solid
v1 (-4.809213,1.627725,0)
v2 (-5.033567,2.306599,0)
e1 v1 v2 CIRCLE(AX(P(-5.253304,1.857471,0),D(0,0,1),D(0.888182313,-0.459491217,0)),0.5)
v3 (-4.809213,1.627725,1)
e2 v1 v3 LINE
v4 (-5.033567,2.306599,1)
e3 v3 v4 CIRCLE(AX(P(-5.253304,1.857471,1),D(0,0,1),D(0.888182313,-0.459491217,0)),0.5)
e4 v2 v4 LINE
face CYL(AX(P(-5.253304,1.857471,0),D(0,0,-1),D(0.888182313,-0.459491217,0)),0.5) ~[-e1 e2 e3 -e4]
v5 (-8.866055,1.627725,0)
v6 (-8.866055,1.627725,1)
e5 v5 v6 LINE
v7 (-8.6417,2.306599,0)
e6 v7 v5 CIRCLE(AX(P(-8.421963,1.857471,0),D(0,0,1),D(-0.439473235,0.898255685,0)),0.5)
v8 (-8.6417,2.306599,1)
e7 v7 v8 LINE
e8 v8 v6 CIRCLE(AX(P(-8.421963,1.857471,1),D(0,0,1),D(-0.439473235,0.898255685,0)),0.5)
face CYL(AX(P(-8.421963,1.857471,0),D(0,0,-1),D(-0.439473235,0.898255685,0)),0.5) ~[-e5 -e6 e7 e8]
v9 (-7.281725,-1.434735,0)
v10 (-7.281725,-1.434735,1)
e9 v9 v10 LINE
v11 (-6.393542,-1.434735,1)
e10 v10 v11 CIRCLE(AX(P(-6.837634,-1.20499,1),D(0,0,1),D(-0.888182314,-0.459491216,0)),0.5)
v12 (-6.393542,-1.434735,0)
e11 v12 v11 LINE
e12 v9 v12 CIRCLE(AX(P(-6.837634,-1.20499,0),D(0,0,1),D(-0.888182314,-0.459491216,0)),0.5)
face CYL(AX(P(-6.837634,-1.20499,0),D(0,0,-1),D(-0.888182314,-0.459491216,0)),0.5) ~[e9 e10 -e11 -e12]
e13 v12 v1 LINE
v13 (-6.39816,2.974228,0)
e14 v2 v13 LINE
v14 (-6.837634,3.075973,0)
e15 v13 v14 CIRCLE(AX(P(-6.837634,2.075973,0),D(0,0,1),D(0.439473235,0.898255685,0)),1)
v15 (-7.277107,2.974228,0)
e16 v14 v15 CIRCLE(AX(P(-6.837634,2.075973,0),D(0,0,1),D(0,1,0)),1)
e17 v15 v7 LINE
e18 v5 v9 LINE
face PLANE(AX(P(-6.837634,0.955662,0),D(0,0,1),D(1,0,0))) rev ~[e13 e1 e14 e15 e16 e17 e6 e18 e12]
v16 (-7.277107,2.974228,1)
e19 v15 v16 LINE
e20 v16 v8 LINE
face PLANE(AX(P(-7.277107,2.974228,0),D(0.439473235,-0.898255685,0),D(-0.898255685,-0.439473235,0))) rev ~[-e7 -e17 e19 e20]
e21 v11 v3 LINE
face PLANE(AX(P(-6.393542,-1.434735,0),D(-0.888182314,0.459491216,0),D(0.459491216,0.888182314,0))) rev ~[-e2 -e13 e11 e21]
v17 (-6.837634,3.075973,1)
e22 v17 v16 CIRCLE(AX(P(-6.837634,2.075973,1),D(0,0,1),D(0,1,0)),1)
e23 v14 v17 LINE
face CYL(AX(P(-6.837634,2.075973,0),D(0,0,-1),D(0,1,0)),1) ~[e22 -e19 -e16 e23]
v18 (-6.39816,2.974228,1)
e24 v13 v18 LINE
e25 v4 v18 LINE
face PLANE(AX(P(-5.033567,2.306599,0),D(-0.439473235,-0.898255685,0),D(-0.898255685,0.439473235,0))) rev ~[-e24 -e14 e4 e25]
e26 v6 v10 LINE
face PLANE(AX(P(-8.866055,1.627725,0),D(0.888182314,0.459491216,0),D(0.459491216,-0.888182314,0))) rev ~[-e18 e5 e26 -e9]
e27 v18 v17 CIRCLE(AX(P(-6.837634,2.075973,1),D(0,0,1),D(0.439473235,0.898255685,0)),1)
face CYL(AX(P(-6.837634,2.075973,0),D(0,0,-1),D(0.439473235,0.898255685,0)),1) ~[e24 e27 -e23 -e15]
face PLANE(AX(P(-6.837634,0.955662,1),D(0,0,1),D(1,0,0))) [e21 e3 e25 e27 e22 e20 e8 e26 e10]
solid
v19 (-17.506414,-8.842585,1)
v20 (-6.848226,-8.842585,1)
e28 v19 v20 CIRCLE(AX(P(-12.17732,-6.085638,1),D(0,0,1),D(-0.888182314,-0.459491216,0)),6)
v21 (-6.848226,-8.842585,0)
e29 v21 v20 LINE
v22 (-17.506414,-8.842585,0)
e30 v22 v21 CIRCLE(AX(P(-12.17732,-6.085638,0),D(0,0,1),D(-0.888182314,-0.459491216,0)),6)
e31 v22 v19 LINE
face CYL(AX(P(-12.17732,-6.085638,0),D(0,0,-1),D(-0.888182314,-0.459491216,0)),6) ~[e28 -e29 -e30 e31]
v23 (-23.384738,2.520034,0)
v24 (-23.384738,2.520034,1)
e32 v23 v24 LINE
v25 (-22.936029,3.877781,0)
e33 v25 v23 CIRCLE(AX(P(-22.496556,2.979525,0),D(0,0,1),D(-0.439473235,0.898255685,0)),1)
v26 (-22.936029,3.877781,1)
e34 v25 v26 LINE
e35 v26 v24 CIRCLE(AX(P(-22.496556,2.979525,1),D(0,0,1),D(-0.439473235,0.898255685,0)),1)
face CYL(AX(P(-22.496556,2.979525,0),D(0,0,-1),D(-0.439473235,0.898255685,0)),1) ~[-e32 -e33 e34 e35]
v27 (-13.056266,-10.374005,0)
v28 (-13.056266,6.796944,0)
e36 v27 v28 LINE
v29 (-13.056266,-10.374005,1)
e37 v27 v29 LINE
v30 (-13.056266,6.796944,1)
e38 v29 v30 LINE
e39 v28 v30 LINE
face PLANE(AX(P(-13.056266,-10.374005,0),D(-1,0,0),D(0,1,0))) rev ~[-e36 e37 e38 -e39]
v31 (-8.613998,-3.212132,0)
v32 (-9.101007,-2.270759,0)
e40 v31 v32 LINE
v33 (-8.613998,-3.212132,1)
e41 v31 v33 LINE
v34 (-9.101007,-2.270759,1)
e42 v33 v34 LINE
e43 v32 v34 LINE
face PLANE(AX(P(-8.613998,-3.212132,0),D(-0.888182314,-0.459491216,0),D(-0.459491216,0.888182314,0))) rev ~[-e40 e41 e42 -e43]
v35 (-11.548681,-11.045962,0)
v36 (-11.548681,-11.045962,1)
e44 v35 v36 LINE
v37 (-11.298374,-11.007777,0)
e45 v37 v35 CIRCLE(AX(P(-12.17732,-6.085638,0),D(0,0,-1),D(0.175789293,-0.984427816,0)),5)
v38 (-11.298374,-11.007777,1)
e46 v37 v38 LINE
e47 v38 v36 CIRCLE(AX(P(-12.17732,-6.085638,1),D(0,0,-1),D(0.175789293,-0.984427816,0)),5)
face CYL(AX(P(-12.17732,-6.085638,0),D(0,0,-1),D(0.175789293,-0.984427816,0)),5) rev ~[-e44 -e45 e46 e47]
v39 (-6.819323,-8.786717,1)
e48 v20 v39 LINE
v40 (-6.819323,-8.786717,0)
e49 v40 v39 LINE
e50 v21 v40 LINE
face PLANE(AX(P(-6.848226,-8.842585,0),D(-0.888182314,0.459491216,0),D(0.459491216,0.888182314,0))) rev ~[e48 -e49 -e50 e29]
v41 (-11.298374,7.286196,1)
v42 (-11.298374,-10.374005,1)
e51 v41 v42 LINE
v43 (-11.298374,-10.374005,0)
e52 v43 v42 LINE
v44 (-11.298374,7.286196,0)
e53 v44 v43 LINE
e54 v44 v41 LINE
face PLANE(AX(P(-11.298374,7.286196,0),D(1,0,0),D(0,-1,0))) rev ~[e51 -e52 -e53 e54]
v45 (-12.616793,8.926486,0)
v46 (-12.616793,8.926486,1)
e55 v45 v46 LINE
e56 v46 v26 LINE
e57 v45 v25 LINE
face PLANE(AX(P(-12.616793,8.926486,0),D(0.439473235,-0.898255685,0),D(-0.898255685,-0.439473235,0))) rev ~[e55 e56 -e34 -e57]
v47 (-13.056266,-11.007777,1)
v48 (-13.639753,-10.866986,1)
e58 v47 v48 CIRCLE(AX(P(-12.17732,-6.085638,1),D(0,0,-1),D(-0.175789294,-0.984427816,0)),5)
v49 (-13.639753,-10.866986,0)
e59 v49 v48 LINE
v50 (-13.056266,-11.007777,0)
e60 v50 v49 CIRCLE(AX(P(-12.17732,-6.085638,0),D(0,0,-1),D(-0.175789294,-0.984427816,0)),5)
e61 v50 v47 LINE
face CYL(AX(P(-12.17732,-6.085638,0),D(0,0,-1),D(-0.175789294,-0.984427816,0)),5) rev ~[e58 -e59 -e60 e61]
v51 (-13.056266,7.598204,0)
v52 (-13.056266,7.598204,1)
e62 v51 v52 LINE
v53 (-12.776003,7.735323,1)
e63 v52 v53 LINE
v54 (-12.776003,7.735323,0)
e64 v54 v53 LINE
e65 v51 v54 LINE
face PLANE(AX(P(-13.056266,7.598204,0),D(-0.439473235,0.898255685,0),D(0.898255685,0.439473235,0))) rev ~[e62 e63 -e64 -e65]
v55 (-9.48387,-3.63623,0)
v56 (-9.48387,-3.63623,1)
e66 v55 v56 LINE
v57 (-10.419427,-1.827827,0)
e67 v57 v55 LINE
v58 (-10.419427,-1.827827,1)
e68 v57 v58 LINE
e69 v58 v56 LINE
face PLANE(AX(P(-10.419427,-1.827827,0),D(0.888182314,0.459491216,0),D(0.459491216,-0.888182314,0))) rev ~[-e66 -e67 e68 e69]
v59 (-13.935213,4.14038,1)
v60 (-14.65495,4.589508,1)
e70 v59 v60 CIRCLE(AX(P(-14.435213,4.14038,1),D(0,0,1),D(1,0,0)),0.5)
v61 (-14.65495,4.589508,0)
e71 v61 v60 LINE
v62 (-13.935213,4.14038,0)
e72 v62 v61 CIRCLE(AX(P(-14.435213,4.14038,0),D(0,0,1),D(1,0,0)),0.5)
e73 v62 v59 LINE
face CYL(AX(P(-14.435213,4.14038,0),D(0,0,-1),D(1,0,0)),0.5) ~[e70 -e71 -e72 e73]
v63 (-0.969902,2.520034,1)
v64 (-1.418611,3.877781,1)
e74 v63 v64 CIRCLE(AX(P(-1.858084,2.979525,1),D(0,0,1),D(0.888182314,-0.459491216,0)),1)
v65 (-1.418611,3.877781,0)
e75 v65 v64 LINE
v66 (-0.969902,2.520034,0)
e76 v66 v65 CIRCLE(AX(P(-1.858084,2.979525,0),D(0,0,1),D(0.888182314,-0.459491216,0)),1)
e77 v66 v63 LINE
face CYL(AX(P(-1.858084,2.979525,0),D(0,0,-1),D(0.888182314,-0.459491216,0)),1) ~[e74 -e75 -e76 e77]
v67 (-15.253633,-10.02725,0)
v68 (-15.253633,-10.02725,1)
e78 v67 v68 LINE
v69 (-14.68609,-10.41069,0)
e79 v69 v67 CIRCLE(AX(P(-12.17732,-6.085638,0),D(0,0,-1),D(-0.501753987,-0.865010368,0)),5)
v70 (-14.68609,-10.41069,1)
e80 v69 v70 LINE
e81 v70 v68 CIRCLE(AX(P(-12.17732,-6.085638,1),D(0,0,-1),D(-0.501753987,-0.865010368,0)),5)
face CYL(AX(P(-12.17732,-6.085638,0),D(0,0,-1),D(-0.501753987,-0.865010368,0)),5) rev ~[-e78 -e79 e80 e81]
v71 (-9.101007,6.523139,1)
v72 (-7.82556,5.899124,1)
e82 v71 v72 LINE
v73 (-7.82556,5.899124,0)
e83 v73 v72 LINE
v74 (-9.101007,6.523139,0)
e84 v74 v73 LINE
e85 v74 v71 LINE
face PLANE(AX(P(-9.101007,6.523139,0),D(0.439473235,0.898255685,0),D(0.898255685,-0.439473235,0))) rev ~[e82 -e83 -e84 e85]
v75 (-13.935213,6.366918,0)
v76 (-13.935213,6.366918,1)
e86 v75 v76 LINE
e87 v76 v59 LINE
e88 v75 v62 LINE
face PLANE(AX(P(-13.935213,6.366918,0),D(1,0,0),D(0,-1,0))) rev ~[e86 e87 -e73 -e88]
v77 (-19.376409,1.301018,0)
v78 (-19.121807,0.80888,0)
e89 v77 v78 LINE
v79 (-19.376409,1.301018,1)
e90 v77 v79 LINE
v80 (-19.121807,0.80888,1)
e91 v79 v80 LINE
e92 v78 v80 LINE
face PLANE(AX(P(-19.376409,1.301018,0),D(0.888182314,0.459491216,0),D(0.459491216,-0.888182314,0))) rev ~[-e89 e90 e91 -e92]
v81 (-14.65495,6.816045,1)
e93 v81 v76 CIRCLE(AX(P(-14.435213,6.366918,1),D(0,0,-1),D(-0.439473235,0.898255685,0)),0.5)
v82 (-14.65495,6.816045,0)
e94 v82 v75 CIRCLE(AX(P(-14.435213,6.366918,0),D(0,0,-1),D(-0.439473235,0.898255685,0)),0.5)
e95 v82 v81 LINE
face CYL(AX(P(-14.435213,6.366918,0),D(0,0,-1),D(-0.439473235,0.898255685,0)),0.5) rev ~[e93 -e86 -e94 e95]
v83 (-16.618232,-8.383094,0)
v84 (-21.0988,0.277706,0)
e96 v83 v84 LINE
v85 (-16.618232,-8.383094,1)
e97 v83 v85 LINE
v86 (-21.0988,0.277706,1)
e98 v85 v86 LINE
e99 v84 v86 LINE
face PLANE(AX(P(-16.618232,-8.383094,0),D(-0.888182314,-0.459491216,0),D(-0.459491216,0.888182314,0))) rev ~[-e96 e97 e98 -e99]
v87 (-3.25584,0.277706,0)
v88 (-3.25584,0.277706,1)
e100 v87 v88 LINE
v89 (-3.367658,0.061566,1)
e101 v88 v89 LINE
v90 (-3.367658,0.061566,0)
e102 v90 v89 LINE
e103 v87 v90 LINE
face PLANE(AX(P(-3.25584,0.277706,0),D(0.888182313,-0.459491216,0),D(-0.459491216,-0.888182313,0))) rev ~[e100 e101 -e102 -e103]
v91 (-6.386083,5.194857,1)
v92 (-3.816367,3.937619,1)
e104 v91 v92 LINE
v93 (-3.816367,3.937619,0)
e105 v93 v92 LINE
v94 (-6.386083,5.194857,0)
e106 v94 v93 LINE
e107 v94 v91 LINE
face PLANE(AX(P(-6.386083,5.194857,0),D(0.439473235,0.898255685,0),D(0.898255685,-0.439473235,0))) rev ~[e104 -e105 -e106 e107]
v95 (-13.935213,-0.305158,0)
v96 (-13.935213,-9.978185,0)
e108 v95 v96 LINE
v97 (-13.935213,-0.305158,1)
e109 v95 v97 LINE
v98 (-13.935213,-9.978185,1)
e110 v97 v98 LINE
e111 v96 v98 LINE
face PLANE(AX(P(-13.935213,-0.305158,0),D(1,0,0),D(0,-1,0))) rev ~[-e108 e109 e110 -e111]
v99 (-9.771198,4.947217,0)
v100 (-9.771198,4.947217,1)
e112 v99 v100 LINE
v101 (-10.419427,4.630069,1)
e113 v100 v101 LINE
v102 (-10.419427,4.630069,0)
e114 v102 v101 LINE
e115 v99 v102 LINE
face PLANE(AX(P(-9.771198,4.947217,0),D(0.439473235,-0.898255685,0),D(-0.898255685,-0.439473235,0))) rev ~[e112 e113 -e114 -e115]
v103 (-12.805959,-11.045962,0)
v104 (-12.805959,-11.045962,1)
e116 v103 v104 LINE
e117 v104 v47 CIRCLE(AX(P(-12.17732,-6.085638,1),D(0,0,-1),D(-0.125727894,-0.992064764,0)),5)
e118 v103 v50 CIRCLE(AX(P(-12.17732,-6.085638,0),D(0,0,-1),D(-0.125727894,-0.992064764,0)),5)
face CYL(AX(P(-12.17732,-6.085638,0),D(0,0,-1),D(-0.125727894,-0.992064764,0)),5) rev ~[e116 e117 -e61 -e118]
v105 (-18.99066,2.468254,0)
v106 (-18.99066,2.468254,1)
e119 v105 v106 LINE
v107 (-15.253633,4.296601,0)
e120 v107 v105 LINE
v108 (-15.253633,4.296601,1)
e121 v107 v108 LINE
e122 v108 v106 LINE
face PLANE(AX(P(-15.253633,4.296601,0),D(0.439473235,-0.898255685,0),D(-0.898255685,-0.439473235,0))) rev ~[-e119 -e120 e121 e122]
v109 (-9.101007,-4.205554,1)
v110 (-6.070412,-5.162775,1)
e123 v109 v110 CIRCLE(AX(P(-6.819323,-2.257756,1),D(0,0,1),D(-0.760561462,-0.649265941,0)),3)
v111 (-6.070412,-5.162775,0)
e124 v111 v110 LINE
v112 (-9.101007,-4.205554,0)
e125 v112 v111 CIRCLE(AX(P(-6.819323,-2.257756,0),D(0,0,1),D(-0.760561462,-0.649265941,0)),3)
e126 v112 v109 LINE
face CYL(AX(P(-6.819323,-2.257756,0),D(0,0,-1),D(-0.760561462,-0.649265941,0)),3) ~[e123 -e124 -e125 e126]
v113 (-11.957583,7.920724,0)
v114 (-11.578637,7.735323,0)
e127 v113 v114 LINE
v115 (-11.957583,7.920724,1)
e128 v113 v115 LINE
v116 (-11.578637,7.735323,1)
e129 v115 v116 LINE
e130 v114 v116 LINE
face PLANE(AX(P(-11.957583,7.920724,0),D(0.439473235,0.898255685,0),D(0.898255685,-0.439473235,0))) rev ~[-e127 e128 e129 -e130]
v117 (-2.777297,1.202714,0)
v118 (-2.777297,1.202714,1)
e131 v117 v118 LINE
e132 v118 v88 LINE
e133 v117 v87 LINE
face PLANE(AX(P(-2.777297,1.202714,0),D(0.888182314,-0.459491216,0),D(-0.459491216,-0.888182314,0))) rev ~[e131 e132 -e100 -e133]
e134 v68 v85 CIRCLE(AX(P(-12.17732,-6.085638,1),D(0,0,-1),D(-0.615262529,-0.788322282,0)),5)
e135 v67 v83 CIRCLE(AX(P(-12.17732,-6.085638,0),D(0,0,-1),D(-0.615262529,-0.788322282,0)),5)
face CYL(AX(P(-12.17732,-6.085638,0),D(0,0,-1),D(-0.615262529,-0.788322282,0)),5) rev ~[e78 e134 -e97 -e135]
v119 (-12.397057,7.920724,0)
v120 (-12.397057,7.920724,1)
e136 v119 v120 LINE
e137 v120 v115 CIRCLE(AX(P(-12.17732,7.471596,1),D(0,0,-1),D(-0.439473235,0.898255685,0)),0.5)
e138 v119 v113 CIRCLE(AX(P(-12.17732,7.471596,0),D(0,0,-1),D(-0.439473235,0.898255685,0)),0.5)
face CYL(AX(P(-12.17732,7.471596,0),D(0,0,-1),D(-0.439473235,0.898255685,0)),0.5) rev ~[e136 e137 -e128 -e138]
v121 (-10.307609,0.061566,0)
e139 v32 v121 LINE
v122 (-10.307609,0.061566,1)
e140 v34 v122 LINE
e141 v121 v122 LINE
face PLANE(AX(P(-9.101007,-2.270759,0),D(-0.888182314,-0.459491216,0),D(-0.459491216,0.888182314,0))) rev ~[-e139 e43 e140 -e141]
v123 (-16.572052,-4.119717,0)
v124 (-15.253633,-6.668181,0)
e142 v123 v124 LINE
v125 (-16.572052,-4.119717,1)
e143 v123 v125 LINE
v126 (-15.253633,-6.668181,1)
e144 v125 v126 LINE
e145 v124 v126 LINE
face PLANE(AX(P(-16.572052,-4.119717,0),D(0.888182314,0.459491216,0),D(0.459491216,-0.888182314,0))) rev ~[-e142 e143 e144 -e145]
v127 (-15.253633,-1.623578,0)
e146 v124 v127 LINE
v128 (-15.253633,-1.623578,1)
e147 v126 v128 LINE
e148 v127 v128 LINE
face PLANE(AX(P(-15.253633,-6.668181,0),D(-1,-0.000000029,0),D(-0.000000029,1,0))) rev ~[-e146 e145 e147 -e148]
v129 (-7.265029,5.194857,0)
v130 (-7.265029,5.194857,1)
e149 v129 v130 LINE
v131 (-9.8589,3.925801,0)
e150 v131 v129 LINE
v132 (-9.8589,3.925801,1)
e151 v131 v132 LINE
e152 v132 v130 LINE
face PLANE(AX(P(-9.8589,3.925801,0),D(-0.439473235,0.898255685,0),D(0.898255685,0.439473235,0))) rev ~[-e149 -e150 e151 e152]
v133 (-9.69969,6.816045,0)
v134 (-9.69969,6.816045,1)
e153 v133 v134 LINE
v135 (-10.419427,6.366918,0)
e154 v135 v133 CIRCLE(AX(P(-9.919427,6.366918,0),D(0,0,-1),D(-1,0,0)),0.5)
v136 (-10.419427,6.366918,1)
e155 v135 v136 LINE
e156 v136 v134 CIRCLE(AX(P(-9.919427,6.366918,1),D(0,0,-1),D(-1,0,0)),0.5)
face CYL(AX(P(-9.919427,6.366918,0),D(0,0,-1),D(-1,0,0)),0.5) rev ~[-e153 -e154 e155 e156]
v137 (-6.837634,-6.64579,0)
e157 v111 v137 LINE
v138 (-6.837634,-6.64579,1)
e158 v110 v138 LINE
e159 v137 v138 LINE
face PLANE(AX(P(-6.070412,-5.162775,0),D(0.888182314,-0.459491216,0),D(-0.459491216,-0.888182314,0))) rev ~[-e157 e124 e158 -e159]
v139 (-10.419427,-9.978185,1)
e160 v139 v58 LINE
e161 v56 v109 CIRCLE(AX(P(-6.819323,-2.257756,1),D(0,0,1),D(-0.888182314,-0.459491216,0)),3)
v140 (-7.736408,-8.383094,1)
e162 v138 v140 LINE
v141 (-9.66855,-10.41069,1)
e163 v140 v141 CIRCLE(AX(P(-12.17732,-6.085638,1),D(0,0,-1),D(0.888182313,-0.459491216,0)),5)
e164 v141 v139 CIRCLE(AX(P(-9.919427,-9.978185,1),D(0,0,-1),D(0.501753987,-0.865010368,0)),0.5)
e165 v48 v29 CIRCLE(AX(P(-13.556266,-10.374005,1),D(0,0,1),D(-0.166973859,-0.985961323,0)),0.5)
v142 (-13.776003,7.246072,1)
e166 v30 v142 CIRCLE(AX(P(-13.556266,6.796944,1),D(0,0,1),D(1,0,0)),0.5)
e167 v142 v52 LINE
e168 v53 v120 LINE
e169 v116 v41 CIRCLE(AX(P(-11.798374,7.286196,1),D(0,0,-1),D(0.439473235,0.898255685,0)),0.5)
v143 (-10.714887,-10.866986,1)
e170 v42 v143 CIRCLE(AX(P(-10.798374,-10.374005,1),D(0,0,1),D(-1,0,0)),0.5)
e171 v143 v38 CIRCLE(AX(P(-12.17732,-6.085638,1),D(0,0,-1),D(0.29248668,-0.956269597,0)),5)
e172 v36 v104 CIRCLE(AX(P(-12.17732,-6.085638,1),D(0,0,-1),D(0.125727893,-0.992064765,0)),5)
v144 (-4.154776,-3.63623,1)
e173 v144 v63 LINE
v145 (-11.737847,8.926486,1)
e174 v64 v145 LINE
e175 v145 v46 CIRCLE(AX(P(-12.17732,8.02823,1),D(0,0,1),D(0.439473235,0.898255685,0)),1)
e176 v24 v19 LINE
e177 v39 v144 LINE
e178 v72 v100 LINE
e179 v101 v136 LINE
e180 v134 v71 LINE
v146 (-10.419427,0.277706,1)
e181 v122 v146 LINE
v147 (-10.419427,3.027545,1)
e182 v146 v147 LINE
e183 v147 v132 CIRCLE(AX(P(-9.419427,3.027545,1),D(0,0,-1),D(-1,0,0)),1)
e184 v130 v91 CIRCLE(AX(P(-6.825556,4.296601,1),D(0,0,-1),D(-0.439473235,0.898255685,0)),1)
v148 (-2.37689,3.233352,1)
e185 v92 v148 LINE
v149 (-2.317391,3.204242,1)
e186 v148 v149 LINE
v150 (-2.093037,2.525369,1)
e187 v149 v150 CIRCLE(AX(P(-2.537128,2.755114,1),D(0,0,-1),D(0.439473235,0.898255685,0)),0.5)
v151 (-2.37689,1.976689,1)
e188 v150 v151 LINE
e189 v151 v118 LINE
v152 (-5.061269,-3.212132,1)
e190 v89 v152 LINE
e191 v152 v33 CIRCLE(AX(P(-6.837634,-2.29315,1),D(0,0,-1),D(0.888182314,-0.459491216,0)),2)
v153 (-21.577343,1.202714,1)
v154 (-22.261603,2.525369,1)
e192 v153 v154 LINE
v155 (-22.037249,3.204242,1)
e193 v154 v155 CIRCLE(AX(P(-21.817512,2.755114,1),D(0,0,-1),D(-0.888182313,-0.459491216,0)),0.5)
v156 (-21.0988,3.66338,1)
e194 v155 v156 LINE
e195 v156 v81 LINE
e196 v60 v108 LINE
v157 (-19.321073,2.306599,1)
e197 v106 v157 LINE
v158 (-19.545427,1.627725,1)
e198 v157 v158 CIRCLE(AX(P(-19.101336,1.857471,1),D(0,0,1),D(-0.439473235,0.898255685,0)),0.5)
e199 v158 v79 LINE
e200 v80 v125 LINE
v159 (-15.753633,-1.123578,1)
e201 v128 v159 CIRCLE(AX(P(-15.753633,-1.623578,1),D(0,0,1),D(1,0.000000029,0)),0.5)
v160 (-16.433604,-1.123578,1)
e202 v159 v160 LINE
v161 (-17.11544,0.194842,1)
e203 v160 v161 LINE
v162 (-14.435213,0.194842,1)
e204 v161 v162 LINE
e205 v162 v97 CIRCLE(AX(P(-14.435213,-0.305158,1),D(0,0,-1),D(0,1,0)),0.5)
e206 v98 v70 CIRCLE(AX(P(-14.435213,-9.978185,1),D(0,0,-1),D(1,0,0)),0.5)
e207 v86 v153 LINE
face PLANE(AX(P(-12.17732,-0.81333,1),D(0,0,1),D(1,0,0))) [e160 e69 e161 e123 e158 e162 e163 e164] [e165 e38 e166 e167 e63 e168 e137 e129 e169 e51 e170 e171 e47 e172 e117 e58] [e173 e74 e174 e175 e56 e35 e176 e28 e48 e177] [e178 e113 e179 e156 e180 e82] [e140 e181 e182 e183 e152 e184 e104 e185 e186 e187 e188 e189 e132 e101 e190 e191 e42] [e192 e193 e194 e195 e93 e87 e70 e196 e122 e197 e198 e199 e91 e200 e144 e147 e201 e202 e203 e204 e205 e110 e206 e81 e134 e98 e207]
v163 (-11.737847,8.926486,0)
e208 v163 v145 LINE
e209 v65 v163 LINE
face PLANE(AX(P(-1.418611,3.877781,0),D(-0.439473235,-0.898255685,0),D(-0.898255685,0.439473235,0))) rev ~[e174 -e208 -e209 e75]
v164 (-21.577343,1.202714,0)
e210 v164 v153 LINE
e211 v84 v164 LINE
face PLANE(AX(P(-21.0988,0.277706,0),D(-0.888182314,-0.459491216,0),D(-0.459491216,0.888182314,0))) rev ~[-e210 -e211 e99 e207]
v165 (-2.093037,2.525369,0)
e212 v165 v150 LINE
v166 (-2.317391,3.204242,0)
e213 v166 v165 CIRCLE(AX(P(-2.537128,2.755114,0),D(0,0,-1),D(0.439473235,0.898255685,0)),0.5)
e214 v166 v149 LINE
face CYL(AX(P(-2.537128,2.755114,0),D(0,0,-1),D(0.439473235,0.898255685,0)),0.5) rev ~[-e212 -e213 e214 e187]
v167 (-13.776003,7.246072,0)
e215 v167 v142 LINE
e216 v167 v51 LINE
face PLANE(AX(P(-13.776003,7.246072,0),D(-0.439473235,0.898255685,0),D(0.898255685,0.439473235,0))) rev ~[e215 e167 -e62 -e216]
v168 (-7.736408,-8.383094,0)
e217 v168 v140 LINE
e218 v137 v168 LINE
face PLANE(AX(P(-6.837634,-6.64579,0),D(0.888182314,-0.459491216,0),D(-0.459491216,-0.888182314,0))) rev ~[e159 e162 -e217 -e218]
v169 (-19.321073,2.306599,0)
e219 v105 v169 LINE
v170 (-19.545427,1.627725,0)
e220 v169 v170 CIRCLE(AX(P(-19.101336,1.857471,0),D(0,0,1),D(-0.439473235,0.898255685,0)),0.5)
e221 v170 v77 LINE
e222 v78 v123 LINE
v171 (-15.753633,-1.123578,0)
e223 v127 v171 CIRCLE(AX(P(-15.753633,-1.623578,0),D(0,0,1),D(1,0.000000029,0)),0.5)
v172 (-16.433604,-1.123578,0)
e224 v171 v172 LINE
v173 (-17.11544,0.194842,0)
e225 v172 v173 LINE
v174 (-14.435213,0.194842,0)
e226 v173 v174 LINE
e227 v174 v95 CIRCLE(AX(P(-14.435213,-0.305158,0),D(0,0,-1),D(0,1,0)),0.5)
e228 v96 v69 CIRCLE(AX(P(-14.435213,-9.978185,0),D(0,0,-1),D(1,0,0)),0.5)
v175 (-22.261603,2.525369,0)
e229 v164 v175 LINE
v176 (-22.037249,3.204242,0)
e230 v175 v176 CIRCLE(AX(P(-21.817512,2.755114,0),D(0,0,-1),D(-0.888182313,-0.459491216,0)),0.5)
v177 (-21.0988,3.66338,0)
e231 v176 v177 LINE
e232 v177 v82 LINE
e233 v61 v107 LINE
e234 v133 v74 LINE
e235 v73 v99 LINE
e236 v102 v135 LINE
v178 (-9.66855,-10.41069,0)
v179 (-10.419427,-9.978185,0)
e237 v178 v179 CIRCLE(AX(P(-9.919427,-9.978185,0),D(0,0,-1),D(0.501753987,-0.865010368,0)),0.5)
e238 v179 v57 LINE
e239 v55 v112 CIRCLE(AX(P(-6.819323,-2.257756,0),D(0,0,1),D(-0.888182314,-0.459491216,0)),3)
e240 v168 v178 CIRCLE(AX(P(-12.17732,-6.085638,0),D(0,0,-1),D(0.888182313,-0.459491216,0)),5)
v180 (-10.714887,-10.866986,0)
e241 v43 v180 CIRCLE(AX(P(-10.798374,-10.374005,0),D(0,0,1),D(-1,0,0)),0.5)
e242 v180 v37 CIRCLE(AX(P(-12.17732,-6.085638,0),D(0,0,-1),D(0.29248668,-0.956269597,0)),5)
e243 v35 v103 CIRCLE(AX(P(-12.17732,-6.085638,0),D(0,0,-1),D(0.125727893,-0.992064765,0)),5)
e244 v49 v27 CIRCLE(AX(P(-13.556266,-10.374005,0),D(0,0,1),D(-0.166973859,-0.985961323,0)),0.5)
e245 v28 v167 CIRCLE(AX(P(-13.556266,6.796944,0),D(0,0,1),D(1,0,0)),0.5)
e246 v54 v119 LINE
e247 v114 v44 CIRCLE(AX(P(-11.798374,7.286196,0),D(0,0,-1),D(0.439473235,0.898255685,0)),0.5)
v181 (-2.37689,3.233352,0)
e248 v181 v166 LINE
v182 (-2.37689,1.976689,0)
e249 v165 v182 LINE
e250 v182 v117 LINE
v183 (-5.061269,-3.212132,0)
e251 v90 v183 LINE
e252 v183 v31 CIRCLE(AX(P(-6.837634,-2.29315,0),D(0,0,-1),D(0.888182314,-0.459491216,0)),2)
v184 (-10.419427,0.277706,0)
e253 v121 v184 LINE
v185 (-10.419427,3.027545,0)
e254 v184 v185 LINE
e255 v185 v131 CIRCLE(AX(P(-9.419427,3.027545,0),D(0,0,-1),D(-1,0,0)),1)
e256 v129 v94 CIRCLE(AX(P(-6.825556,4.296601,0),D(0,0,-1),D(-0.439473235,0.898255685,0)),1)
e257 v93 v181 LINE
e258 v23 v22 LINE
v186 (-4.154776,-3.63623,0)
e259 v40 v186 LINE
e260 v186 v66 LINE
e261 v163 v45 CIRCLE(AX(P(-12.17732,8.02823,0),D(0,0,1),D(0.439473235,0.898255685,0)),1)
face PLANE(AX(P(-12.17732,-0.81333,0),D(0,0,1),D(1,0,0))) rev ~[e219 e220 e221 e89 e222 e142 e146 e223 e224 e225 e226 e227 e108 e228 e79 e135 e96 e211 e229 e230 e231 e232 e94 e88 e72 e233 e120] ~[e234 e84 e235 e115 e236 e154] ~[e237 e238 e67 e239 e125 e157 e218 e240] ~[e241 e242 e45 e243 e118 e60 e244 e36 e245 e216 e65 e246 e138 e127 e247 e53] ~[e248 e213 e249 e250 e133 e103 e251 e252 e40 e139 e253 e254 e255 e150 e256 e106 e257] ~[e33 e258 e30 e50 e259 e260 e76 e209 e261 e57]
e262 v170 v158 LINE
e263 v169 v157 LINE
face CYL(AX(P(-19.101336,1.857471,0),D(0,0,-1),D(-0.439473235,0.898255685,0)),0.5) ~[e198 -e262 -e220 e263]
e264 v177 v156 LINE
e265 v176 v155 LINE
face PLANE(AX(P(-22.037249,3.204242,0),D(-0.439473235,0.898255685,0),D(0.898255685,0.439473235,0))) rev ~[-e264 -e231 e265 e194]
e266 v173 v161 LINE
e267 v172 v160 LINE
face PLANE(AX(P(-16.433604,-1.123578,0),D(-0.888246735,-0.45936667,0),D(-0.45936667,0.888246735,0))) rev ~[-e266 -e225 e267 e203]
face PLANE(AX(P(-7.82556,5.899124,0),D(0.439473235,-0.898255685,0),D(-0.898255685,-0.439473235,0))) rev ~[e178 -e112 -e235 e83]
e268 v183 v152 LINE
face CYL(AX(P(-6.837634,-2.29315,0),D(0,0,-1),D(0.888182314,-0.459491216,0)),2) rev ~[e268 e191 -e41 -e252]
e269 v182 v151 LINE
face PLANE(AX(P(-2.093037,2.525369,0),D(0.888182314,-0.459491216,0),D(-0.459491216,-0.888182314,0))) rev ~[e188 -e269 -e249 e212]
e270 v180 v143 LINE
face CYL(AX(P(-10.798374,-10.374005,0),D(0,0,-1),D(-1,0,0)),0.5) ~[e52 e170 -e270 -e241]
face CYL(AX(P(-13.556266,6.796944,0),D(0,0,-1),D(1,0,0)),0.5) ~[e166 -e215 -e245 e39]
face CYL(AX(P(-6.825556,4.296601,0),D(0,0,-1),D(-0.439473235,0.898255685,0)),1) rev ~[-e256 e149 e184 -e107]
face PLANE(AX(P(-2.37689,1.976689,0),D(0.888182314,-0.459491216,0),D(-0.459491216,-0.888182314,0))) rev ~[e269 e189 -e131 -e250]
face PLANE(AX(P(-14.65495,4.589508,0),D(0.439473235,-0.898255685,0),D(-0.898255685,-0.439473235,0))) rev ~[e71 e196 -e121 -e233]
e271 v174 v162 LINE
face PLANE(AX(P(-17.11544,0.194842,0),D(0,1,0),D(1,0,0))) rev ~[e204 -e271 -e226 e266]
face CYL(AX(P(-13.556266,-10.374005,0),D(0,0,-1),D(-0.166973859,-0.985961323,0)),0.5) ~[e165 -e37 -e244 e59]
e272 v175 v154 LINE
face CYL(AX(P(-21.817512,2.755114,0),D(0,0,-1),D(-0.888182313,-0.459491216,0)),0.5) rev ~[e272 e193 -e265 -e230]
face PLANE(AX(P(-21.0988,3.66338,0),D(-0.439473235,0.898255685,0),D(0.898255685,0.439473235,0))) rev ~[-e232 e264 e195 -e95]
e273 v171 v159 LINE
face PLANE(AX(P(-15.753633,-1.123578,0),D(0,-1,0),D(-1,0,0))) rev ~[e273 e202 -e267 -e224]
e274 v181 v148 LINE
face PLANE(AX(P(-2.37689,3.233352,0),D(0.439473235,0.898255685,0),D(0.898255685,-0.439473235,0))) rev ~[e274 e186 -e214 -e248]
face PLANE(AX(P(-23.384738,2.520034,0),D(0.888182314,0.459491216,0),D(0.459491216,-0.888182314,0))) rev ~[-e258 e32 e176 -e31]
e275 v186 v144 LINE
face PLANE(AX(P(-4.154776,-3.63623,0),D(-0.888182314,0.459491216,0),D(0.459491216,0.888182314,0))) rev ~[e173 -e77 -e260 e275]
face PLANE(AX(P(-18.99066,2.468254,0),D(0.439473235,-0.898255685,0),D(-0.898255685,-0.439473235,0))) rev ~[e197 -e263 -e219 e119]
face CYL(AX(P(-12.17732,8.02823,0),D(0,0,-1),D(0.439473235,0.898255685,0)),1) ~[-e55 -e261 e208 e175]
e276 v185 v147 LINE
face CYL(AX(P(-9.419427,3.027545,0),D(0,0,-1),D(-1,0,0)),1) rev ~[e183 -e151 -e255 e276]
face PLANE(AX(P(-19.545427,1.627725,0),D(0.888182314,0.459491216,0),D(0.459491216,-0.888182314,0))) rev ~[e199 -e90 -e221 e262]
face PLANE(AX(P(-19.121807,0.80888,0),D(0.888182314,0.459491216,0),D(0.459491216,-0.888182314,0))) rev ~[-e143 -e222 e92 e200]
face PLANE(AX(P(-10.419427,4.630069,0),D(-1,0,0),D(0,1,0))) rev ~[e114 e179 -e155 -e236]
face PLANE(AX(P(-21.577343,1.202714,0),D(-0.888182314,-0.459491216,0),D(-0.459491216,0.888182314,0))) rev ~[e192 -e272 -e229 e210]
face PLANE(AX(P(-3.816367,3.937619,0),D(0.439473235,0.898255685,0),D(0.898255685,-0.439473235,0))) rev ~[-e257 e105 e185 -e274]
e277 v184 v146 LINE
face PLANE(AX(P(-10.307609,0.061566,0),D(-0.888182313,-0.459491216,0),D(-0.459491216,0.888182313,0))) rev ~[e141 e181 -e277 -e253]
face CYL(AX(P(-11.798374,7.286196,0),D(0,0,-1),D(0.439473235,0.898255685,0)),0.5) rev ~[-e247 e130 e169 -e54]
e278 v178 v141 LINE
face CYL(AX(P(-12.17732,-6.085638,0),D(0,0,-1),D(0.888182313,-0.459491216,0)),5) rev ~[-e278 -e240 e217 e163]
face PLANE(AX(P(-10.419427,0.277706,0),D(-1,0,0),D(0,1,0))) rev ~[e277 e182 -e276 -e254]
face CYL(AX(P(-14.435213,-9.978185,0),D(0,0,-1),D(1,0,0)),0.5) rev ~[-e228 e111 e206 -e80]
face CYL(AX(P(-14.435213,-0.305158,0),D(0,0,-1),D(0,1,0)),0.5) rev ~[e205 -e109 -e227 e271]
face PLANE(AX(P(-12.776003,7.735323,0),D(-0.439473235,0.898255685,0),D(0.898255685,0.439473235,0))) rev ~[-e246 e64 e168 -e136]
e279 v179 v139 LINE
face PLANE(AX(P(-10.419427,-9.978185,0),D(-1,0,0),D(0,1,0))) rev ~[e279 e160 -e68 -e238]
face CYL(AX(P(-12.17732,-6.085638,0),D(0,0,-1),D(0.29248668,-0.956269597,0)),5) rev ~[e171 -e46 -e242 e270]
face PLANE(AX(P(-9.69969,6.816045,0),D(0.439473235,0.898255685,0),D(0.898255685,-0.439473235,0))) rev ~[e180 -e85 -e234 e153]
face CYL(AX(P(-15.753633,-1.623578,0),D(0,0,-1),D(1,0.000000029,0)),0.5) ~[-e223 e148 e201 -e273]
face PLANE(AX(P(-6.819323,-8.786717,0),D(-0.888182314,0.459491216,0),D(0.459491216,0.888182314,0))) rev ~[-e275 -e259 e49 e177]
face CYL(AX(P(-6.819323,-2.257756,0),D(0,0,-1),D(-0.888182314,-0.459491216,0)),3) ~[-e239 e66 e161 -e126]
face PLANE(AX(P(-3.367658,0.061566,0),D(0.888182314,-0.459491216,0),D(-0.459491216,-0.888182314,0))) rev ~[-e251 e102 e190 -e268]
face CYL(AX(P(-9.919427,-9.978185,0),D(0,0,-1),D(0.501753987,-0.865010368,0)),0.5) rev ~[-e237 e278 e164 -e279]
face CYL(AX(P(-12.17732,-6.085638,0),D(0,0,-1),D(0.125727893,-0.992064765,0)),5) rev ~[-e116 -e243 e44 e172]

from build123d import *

# Parameters (mm, degrees)
F1_DEPTH = 1


# Not quite as in the source:
# - a feature names something its author has since deleted; it is built from what else it names


with BuildPart() as f1:
    # F0 (on Top) → F1 (new body)
    with BuildSketch(Plane.XY):
        with BuildLine():
            ThreePointArc((-11.7378467649, 8.9264858588), (-12.17732, 9.0282301738), (-12.6167932351, 8.9264858588))
            Line((-12.6167932351, 8.9264858588), (-22.9360292278, 3.8777807945))
            ThreePointArc((-22.9360292278, 3.8777807945), (-23.4460487393, 3.2933140895), (-23.3847383062, 2.5200338931))
            Line((-23.3847383062, 2.5200338931), (-17.5064138811, -8.8425854586))
            ThreePointArc((-17.5064138811, -8.8425854586), (-12.17732, -12.0856381601), (-6.8482261189, -8.8425854586))
            Line((-6.8482261189, -8.8425854586), (-6.8193229677, -8.786716561))
            Line((-6.8193229677, -8.786716561), (-4.1547760271, -3.6362297146))
            Line((-4.1547760271, -3.6362297146), (-0.9699016938, 2.5200338931))
            ThreePointArc((-0.9699016938, 2.5200338931), (-0.9085912607, 3.2933140895), (-1.4186107722, 3.8777807945))
            Line((-1.4186107722, 3.8777807945), (-11.7378467649, 8.9264858588))
        make_face()
        with BuildLine():
            ThreePointArc((-13.9352129405, -9.9781848161), (-14.1856518225, -10.4114506102), (-14.6860899339, -10.4106900001))
            ThreePointArc((-14.6860899339, -10.4106900001), (-14.9764347702, -10.2286994079), (-15.253632646, -10.0272495698))
            ThreePointArc((-15.253632646, -10.0272495698), (-16.0247836651, -9.2789159973), (-16.6182315676, -8.3830942422))
            Line((-16.6182315676, -8.3830942422), (-21.0987998739, 0.2777057515))
            Line((-21.0987998739, 0.2777057515), (-21.5773427489, 1.202714332))
            Line((-21.5773427489, 1.202714332), (-22.2616031934, 2.5253686134))
            ThreePointArc((-22.2616031934, 2.5253686134), (-22.29225841, 2.9120087116), (-22.0372486542, 3.2042420641))
            Line((-22.0372486542, 3.2042420641), (-21.0987998739, 3.6633798445))
            Line((-21.0987998739, 3.6633798445), (-14.6549495581, 6.8160453855))
            ThreePointArc((-14.6549495581, 6.8160453855), (-14.1705134022, 6.7911040048), (-13.9352129405, 6.366917543))
            Line((-13.9352129405, 6.366917543), (-13.9352129405, 4.1403800065))
            ThreePointArc((-13.9352129405, 4.1403800065), (-14.1705134022, 4.5645664683), (-14.6549495581, 4.589507849))
            Line((-14.6549495581, 4.589507849), (-15.253632646, 4.2966010544))
            Line((-15.253632646, 4.2966010544), (-18.9906600384, 2.4682535744))
            Line((-18.9906600384, 2.4682535744), (-18.5866887981, 1.687389658))
            Line((-18.5866887981, 1.687389658), (-16.9010777379, 2.5120779491))
            Line((-16.9010777379, 2.5120779491), (-14.6549495581, 3.6110002651))
            ThreePointArc((-14.6549495581, 3.6110002651), (-14.1705134022, 3.5860588844), (-13.9352129405, 3.1618724226))
            Line((-13.9352129405, 3.1618724226), (-13.9352129405, 1.0737917123))
            Line((-13.9352129405, 1.0737917123), (-13.9352129405, -0.3051582877))
            Line((-13.9352129405, -0.3051582877), (-13.9352129405, -9.9781848161))
        make_face(mode=Mode.SUBTRACT)
        with BuildLine():
            Line((-10.6659804544, -10.8341303593), (-10.4194270595, -10.7664300173))
            ThreePointArc((-10.4194270595, -10.7664300173), (-10.5663720437, -10.8190139832), (-10.7148866004, -10.8669861449))
            ThreePointArc((-10.7148866004, -10.8669861449), (-11.0045154737, -10.9461452883), (-11.2983735297, -11.0077772381))
            ThreePointArc((-11.2983735297, -11.0077772381), (-11.423285282, -11.0284543254), (-11.548680536, -11.0459619827))
            ThreePointArc((-11.548680536, -11.0459619827), (-11.6318465406, -11.0842260567), (-11.720595012, -11.1066856319))
            ThreePointArc((-11.720595012, -11.1066856319), (-12.17732, -11.1424265632), (-12.634044988, -11.1066856319))
            ThreePointArc((-12.634044988, -11.1066856319), (-12.7227934594, -11.0842260567), (-12.805959464, -11.0459619827))
            ThreePointArc((-12.805959464, -11.0459619827), (-12.931354718, -11.0284543254), (-13.0562664703, -11.0077772381))
            ThreePointArc((-13.0562664703, -11.0077772381), (-13.3501245263, -10.9461452883), (-13.6397533997, -10.8669861449))
            ThreePointArc((-13.6397533997, -10.8669861449), (-13.2335773511, -10.7559370641), (-13.0562664703, -10.3740054834))
            Line((-13.0562664703, -10.3740054834), (-13.0562664703, -10.0437429667))
            Line((-13.0562664703, -10.0437429667), (-13.0562664703, 5.3716664708))
            Line((-13.0562664703, 5.3716664708), (-13.0562664703, 6.7969437096))
            ThreePointArc((-13.0562664703, 6.7969437096), (-13.2915669319, 7.2211301714), (-13.7760030878, 7.246071552))
            Line((-13.7760030878, 7.246071552), (-13.0562664703, 7.5982040073))
            Line((-13.0562664703, 7.5982040073), (-12.7760030878, 7.7353233792))
            Line((-12.7760030878, 7.7353233792), (-12.3970566176, 7.9207236322))
            ThreePointArc((-12.3970566176, 7.9207236322), (-12.17732, 7.9715957897), (-11.9575833824, 7.9207236322))
            Line((-11.9575833824, 7.9207236322), (-11.5786369122, 7.7353233792))
            ThreePointArc((-11.5786369122, 7.7353233792), (-11.3741870679, 7.5508950751), (-11.2983735297, 7.2861955367))
            Line((-11.2983735297, 7.2861955367), (-11.2983735297, -10.0437429667))
            Line((-11.2983735297, -10.0437429667), (-11.2983735297, -10.3519767804))
            ThreePointArc((-11.2983735297, -10.3519767804), (-11.1015265128, -10.7495925105), (-10.6659804544, -10.8341303593))
        make_face(mode=Mode.SUBTRACT)
        with BuildLine():
            Line((-5.5053601225, -4.0705468447), (-6.0704119356, -5.1627745276))
            Line((-6.0704119356, -5.1627745276), (-6.8376335928, -6.6457902679))
            Line((-6.8376335928, -6.6457902679), (-7.7364084324, -8.3830942422))
            ThreePointArc((-7.7364084324, -8.3830942422), (-8.5576094615, -9.5349418025), (-9.6685500661, -10.4106900001))
            ThreePointArc((-9.6685500661, -10.4106900001), (-10.1689881775, -10.4114506102), (-10.4194270595, -9.9781848161))
            Line((-10.4194270595, -9.9781848161), (-10.4194270595, -1.8278266693))
            Line((-10.4194270595, -1.8278266693), (-10.4194270595, -0.3051582877))
            Line((-10.4194270595, -0.3051582877), (-10.4194270595, 0.2777057515))
            Line((-10.4194270595, 0.2777057515), (-10.4194270595, 0.5210568374))
            Line((-10.4194270595, 0.5210568374), (-10.4194270595, 3.0275448634))
            Line((-10.4194270595, 3.0275448634), (-10.4194270595, 4.6300693884))
            Line((-10.4194270595, 4.6300693884), (-10.4194270595, 6.366917543))
            Line((-10.4194270595, 6.366917543), (-10.4194270595, 7.1681778407))
            Line((-10.4194270595, 7.1681778407), (-9.6996904419, 6.8160453855))
            Line((-9.6996904419, 6.8160453855), (-9.101007354, 6.5231385909))
            Line((-9.101007354, 6.5231385909), (-7.825559943, 5.8991236145))
            Line((-7.825559943, 5.8991236145), (-6.386082692, 5.1948567393))
            Line((-6.386082692, 5.1948567393), (-3.816366891, 3.9376185884))
            Line((-3.816366891, 3.9376185884), (-2.3768901261, 3.2333519511))
            Line((-2.3768901261, 3.2333519511), (-2.3173913458, 3.2042420641))
            ThreePointArc((-2.3173913458, 3.2042420641), (-2.06238159, 2.9120087116), (-2.0930368066, 2.5253686134))
            Line((-2.0930368066, 2.5253686134), (-2.3768901261, 1.9766889238))
            Line((-2.3768901261, 1.9766889238), (-2.7772972511, 1.202714332))
            Line((-2.7772972511, 1.202714332), (-3.2558401261, 0.2777057515))
            Line((-3.2558401261, 0.2777057515), (-3.3676578126, 0.061565621))
            Line((-3.3676578126, 0.061565621), (-5.0612689658, -3.2121323703))
            Line((-5.0612689658, -3.2121323703), (-5.5053601225, -4.0705468447))
        make_face(mode=Mode.SUBTRACT)
        with BuildLine():
            Line((-16.5720523514, -4.1197169088), (-15.2536327446, -6.6681812422))
            Line((-15.2536327446, -6.6681812422), (-15.2536328928, -1.623578273))
            ThreePointArc((-15.2536328928, -1.623578273), (-15.4000795074, -1.2700248919), (-15.7536328928, -1.1235782877))
            Line((-15.7536328928, -1.1235782877), (-16.0720525039, -1.1235782877))
            Line((-16.0720525039, -1.1235782877), (-16.4336040792, -1.1235782877))
            Line((-16.4336040792, -1.1235782877), (-17.1154396337, 0.1948417123))
            Line((-17.1154396337, 0.1948417123), (-16.0720524345, 0.1948417123))
            Line((-16.0720524345, 0.1948417123), (-15.2536329075, 0.1948417123))
            Line((-15.2536329075, 0.1948417123), (-14.4352129405, 0.1948417123))
            ThreePointArc((-14.4352129405, 0.1948417123), (-14.08165955, 0.0483951029), (-13.9352129405, -0.3051582877))
            Line((-13.9352129405, -0.3051582877), (-13.9352129405, 1.0737917123))
            Line((-13.9352129405, 1.0737917123), (-15.2536329075, 1.0737917123))
            Line((-15.2536329075, 1.0737917123), (-18.2692507427, 1.0737917123))
            Line((-18.2692507427, 1.0737917123), (-18.6097401643, 1.0737917123))
            Line((-18.6097401643, 1.0737917123), (-19.1218068604, 0.8088797168))
            Line((-19.1218068604, 0.8088797168), (-16.5720523514, -4.1197169088))
        make_face()
        Polygon((-16.1325828631, -3.0563212317), (-16.6777508926, -2.0025282877), (-16.1325828631, -2.0025282877), (-16.1325828631, -2.6348403451), align=None, mode=Mode.SUBTRACT)
        with BuildLine():
            Line((-15.2536329075, 1.0737917123), (-13.9352129405, 1.0737917123))
            Line((-13.9352129405, 1.0737917123), (-13.9352129405, 3.1618724226))
            ThreePointArc((-13.9352129405, 3.1618724226), (-14.1705134022, 3.5860588844), (-14.6549495581, 3.6110002651))
            Line((-14.6549495581, 3.6110002651), (-16.9010777379, 2.5120779491))
            Line((-16.9010777379, 2.5120779491), (-18.5866887981, 1.687389658))
            Line((-18.5866887981, 1.687389658), (-18.3411390159, 1.2127495215))
            Line((-18.3411390159, 1.2127495215), (-18.2692507427, 1.0737917123))
            Line((-18.2692507427, 1.0737917123), (-15.2536329075, 1.0737917123))
        make_face()
        with BuildLine():
            ThreePointArc((-9.101007354, -4.2055538888), (-7.7228805899, -5.1184524182), (-6.0704119356, -5.1627745276))
            Line((-6.0704119356, -5.1627745276), (-5.5053601225, -4.0705468447))
            Line((-5.5053601225, -4.0705468447), (-5.0612689658, -3.2121323703))
            ThreePointArc((-5.0612689658, -3.2121323703), (-6.8376335928, -4.2931499375), (-8.6139982198, -3.2121323703))
            Line((-8.6139982198, -3.2121323703), (-9.101007354, -2.2707587726))
            Line((-9.101007354, -2.2707587726), (-9.101007354, -4.2055538888))
        make_face()
        with BuildLine():
            Line((-10.4194270595, 4.6300693884), (-10.4194270595, 3.0275448634))
            ThreePointArc((-10.4194270595, 3.0275448634), (-10.2677999831, 3.5569439401), (-9.8589002946, 3.9258005484))
            Line((-9.8589002946, 3.9258005484), (-7.2650291622, 5.1948567393))
            ThreePointArc((-7.2650291622, 5.1948567393), (-6.8255559271, 5.2966010544), (-6.386082692, 5.1948567393))
            Line((-6.386082692, 5.1948567393), (-7.825559943, 5.8991236145))
            Line((-7.825559943, 5.8991236145), (-9.7711979643, 4.9472166576))
            Line((-9.7711979643, 4.9472166576), (-10.4194270595, 4.6300693884))
        make_face()
        with BuildLine():
            ThreePointArc((-9.4838699082, -3.6362297146), (-9.3087674014, -3.9318726716), (-9.101007354, -4.2055538888))
            Line((-9.101007354, -4.2055538888), (-9.101007354, -2.2707587726))
            Line((-9.101007354, -2.2707587726), (-10.307609373, 0.061565621))
            Line((-10.307609373, 0.061565621), (-10.4194270595, 0.2777057515))
            Line((-10.4194270595, 0.2777057515), (-10.4194270595, -0.3051582877))
            Line((-10.4194270595, -0.3051582877), (-10.4194270595, -1.8278266693))
            Line((-10.4194270595, -1.8278266693), (-9.4838699082, -3.6362297146))
        make_face()
        with BuildLine():
            Line((-19.5454273692, 1.6277250617), (-19.3764089282, 1.3010176414))
            Line((-19.3764089282, 1.3010176414), (-18.5866887981, 1.687389658))
            Line((-18.5866887981, 1.687389658), (-18.9906600384, 2.4682535744))
            Line((-18.9906600384, 2.4682535744), (-19.32107283, 2.3065985124))
            ThreePointArc((-19.32107283, 2.3065985124), (-19.5760825858, 2.01436516), (-19.5454273692, 1.6277250617))
        make_face()
        Polygon((-19.3764089282, 1.3010176414), (-19.1218068604, 0.8088797168), (-18.6097401643, 1.0737917123), (-18.3411390159, 1.2127495215), (-18.5866887981, 1.687389658), align=None)
        Polygon((-16.1325828631, -2.0025282877), (-16.6777508926, -2.0025282877), (-16.1325828631, -3.0563212317), (-16.1325828631, -2.6348403451), align=None)
        with BuildLine():
            Line((-10.4194270595, 7.1681778407), (-10.4194270595, 6.366917543))
            ThreePointArc((-10.4194270595, 6.366917543), (-10.1841265978, 6.7911040048), (-9.6996904419, 6.8160453855))
            Line((-9.6996904419, 6.8160453855), (-10.4194270595, 7.1681778407))
        make_face()
        with BuildLine():
            ThreePointArc((-11.720595012, -11.1066856319), (-11.6318465406, -11.0842260567), (-11.548680536, -11.0459619827))
            ThreePointArc((-11.548680536, -11.0459619827), (-12.17732, -11.0856381601), (-12.805959464, -11.0459619827))
            ThreePointArc((-12.805959464, -11.0459619827), (-12.7227934594, -11.0842260567), (-12.634044988, -11.1066856319))
            ThreePointArc((-12.634044988, -11.1066856319), (-12.17732, -11.1424265632), (-11.720595012, -11.1066856319))
        make_face()
        Polygon((-18.3411390159, 1.2127495215), (-18.6097401643, 1.0737917123), (-18.2692507427, 1.0737917123), align=None)
        with BuildLine():
            ThreePointArc((-10.7148866004, -10.8669861449), (-10.5663720437, -10.8190139832), (-10.4194270595, -10.7664300173))
            Line((-10.4194270595, -10.7664300173), (-10.6659804544, -10.8341303593))
            ThreePointArc((-10.6659804544, -10.8341303593), (-11.1015265128, -10.7495925105), (-11.2983735297, -10.3519767804))
            Line((-11.2983735297, -10.3519767804), (-11.2983735297, -10.3740054834))
            ThreePointArc((-11.2983735297, -10.3740054834), (-11.1210626489, -10.7559370641), (-10.7148866004, -10.8669861449))
        make_face()
    extrude(amount=F1_DEPTH)


with BuildPart() as f1b:
    # F0 (on Top) → F1, piece 2 (new body)
    with BuildSketch(Plane.XY):
        with BuildLine():
            ThreePointArc((-7.2817247495, -1.4347354631), (-6.8376335928, -1.7049898549), (-6.393542436, -1.4347354631))
            Line((-6.393542436, -1.4347354631), (-4.8092126308, 1.6277250617))
            ThreePointArc((-4.8092126308, 1.6277250617), (-4.7785574142, 2.01436516), (-5.03356717, 2.3065985124))
            Line((-5.03356717, 2.3065985124), (-6.3981603577, 2.9742282228))
            ThreePointArc((-6.3981603577, 2.9742282228), (-6.6120850226, 3.0502044622), (-6.8376335928, 3.0759725378))
            ThreePointArc((-6.8376335928, 3.0759725378), (-7.063182163, 3.0502044622), (-7.2771068279, 2.9742282228))
            Line((-7.2771068279, 2.9742282228), (-8.6417000156, 2.3065985124))
            ThreePointArc((-8.6417000156, 2.3065985124), (-8.8967097713, 2.01436516), (-8.8660545548, 1.6277250617))
            Line((-8.8660545548, 1.6277250617), (-7.2817247495, -1.4347354631))
        make_face()
        Polygon((-6.8581561948, 2.2207744428), (-6.8376335928, 2.2107337222), (-5.7679512019, 1.687389658), (-6.8376335928, -0.3802733283), (-7.9034853086, 1.6799850815), align=None, mode=Mode.SUBTRACT)
        Polygon((-5.7679512019, 1.687389658), (-6.8376335928, 2.2107337222), (-6.8581561948, 2.2207744428), (-7.9034853086, 1.6799850815), (-6.8376335928, -0.3802733283), align=None)
    extrude(amount=F1_DEPTH)


solid = Compound([f1.part, f1b.part])
